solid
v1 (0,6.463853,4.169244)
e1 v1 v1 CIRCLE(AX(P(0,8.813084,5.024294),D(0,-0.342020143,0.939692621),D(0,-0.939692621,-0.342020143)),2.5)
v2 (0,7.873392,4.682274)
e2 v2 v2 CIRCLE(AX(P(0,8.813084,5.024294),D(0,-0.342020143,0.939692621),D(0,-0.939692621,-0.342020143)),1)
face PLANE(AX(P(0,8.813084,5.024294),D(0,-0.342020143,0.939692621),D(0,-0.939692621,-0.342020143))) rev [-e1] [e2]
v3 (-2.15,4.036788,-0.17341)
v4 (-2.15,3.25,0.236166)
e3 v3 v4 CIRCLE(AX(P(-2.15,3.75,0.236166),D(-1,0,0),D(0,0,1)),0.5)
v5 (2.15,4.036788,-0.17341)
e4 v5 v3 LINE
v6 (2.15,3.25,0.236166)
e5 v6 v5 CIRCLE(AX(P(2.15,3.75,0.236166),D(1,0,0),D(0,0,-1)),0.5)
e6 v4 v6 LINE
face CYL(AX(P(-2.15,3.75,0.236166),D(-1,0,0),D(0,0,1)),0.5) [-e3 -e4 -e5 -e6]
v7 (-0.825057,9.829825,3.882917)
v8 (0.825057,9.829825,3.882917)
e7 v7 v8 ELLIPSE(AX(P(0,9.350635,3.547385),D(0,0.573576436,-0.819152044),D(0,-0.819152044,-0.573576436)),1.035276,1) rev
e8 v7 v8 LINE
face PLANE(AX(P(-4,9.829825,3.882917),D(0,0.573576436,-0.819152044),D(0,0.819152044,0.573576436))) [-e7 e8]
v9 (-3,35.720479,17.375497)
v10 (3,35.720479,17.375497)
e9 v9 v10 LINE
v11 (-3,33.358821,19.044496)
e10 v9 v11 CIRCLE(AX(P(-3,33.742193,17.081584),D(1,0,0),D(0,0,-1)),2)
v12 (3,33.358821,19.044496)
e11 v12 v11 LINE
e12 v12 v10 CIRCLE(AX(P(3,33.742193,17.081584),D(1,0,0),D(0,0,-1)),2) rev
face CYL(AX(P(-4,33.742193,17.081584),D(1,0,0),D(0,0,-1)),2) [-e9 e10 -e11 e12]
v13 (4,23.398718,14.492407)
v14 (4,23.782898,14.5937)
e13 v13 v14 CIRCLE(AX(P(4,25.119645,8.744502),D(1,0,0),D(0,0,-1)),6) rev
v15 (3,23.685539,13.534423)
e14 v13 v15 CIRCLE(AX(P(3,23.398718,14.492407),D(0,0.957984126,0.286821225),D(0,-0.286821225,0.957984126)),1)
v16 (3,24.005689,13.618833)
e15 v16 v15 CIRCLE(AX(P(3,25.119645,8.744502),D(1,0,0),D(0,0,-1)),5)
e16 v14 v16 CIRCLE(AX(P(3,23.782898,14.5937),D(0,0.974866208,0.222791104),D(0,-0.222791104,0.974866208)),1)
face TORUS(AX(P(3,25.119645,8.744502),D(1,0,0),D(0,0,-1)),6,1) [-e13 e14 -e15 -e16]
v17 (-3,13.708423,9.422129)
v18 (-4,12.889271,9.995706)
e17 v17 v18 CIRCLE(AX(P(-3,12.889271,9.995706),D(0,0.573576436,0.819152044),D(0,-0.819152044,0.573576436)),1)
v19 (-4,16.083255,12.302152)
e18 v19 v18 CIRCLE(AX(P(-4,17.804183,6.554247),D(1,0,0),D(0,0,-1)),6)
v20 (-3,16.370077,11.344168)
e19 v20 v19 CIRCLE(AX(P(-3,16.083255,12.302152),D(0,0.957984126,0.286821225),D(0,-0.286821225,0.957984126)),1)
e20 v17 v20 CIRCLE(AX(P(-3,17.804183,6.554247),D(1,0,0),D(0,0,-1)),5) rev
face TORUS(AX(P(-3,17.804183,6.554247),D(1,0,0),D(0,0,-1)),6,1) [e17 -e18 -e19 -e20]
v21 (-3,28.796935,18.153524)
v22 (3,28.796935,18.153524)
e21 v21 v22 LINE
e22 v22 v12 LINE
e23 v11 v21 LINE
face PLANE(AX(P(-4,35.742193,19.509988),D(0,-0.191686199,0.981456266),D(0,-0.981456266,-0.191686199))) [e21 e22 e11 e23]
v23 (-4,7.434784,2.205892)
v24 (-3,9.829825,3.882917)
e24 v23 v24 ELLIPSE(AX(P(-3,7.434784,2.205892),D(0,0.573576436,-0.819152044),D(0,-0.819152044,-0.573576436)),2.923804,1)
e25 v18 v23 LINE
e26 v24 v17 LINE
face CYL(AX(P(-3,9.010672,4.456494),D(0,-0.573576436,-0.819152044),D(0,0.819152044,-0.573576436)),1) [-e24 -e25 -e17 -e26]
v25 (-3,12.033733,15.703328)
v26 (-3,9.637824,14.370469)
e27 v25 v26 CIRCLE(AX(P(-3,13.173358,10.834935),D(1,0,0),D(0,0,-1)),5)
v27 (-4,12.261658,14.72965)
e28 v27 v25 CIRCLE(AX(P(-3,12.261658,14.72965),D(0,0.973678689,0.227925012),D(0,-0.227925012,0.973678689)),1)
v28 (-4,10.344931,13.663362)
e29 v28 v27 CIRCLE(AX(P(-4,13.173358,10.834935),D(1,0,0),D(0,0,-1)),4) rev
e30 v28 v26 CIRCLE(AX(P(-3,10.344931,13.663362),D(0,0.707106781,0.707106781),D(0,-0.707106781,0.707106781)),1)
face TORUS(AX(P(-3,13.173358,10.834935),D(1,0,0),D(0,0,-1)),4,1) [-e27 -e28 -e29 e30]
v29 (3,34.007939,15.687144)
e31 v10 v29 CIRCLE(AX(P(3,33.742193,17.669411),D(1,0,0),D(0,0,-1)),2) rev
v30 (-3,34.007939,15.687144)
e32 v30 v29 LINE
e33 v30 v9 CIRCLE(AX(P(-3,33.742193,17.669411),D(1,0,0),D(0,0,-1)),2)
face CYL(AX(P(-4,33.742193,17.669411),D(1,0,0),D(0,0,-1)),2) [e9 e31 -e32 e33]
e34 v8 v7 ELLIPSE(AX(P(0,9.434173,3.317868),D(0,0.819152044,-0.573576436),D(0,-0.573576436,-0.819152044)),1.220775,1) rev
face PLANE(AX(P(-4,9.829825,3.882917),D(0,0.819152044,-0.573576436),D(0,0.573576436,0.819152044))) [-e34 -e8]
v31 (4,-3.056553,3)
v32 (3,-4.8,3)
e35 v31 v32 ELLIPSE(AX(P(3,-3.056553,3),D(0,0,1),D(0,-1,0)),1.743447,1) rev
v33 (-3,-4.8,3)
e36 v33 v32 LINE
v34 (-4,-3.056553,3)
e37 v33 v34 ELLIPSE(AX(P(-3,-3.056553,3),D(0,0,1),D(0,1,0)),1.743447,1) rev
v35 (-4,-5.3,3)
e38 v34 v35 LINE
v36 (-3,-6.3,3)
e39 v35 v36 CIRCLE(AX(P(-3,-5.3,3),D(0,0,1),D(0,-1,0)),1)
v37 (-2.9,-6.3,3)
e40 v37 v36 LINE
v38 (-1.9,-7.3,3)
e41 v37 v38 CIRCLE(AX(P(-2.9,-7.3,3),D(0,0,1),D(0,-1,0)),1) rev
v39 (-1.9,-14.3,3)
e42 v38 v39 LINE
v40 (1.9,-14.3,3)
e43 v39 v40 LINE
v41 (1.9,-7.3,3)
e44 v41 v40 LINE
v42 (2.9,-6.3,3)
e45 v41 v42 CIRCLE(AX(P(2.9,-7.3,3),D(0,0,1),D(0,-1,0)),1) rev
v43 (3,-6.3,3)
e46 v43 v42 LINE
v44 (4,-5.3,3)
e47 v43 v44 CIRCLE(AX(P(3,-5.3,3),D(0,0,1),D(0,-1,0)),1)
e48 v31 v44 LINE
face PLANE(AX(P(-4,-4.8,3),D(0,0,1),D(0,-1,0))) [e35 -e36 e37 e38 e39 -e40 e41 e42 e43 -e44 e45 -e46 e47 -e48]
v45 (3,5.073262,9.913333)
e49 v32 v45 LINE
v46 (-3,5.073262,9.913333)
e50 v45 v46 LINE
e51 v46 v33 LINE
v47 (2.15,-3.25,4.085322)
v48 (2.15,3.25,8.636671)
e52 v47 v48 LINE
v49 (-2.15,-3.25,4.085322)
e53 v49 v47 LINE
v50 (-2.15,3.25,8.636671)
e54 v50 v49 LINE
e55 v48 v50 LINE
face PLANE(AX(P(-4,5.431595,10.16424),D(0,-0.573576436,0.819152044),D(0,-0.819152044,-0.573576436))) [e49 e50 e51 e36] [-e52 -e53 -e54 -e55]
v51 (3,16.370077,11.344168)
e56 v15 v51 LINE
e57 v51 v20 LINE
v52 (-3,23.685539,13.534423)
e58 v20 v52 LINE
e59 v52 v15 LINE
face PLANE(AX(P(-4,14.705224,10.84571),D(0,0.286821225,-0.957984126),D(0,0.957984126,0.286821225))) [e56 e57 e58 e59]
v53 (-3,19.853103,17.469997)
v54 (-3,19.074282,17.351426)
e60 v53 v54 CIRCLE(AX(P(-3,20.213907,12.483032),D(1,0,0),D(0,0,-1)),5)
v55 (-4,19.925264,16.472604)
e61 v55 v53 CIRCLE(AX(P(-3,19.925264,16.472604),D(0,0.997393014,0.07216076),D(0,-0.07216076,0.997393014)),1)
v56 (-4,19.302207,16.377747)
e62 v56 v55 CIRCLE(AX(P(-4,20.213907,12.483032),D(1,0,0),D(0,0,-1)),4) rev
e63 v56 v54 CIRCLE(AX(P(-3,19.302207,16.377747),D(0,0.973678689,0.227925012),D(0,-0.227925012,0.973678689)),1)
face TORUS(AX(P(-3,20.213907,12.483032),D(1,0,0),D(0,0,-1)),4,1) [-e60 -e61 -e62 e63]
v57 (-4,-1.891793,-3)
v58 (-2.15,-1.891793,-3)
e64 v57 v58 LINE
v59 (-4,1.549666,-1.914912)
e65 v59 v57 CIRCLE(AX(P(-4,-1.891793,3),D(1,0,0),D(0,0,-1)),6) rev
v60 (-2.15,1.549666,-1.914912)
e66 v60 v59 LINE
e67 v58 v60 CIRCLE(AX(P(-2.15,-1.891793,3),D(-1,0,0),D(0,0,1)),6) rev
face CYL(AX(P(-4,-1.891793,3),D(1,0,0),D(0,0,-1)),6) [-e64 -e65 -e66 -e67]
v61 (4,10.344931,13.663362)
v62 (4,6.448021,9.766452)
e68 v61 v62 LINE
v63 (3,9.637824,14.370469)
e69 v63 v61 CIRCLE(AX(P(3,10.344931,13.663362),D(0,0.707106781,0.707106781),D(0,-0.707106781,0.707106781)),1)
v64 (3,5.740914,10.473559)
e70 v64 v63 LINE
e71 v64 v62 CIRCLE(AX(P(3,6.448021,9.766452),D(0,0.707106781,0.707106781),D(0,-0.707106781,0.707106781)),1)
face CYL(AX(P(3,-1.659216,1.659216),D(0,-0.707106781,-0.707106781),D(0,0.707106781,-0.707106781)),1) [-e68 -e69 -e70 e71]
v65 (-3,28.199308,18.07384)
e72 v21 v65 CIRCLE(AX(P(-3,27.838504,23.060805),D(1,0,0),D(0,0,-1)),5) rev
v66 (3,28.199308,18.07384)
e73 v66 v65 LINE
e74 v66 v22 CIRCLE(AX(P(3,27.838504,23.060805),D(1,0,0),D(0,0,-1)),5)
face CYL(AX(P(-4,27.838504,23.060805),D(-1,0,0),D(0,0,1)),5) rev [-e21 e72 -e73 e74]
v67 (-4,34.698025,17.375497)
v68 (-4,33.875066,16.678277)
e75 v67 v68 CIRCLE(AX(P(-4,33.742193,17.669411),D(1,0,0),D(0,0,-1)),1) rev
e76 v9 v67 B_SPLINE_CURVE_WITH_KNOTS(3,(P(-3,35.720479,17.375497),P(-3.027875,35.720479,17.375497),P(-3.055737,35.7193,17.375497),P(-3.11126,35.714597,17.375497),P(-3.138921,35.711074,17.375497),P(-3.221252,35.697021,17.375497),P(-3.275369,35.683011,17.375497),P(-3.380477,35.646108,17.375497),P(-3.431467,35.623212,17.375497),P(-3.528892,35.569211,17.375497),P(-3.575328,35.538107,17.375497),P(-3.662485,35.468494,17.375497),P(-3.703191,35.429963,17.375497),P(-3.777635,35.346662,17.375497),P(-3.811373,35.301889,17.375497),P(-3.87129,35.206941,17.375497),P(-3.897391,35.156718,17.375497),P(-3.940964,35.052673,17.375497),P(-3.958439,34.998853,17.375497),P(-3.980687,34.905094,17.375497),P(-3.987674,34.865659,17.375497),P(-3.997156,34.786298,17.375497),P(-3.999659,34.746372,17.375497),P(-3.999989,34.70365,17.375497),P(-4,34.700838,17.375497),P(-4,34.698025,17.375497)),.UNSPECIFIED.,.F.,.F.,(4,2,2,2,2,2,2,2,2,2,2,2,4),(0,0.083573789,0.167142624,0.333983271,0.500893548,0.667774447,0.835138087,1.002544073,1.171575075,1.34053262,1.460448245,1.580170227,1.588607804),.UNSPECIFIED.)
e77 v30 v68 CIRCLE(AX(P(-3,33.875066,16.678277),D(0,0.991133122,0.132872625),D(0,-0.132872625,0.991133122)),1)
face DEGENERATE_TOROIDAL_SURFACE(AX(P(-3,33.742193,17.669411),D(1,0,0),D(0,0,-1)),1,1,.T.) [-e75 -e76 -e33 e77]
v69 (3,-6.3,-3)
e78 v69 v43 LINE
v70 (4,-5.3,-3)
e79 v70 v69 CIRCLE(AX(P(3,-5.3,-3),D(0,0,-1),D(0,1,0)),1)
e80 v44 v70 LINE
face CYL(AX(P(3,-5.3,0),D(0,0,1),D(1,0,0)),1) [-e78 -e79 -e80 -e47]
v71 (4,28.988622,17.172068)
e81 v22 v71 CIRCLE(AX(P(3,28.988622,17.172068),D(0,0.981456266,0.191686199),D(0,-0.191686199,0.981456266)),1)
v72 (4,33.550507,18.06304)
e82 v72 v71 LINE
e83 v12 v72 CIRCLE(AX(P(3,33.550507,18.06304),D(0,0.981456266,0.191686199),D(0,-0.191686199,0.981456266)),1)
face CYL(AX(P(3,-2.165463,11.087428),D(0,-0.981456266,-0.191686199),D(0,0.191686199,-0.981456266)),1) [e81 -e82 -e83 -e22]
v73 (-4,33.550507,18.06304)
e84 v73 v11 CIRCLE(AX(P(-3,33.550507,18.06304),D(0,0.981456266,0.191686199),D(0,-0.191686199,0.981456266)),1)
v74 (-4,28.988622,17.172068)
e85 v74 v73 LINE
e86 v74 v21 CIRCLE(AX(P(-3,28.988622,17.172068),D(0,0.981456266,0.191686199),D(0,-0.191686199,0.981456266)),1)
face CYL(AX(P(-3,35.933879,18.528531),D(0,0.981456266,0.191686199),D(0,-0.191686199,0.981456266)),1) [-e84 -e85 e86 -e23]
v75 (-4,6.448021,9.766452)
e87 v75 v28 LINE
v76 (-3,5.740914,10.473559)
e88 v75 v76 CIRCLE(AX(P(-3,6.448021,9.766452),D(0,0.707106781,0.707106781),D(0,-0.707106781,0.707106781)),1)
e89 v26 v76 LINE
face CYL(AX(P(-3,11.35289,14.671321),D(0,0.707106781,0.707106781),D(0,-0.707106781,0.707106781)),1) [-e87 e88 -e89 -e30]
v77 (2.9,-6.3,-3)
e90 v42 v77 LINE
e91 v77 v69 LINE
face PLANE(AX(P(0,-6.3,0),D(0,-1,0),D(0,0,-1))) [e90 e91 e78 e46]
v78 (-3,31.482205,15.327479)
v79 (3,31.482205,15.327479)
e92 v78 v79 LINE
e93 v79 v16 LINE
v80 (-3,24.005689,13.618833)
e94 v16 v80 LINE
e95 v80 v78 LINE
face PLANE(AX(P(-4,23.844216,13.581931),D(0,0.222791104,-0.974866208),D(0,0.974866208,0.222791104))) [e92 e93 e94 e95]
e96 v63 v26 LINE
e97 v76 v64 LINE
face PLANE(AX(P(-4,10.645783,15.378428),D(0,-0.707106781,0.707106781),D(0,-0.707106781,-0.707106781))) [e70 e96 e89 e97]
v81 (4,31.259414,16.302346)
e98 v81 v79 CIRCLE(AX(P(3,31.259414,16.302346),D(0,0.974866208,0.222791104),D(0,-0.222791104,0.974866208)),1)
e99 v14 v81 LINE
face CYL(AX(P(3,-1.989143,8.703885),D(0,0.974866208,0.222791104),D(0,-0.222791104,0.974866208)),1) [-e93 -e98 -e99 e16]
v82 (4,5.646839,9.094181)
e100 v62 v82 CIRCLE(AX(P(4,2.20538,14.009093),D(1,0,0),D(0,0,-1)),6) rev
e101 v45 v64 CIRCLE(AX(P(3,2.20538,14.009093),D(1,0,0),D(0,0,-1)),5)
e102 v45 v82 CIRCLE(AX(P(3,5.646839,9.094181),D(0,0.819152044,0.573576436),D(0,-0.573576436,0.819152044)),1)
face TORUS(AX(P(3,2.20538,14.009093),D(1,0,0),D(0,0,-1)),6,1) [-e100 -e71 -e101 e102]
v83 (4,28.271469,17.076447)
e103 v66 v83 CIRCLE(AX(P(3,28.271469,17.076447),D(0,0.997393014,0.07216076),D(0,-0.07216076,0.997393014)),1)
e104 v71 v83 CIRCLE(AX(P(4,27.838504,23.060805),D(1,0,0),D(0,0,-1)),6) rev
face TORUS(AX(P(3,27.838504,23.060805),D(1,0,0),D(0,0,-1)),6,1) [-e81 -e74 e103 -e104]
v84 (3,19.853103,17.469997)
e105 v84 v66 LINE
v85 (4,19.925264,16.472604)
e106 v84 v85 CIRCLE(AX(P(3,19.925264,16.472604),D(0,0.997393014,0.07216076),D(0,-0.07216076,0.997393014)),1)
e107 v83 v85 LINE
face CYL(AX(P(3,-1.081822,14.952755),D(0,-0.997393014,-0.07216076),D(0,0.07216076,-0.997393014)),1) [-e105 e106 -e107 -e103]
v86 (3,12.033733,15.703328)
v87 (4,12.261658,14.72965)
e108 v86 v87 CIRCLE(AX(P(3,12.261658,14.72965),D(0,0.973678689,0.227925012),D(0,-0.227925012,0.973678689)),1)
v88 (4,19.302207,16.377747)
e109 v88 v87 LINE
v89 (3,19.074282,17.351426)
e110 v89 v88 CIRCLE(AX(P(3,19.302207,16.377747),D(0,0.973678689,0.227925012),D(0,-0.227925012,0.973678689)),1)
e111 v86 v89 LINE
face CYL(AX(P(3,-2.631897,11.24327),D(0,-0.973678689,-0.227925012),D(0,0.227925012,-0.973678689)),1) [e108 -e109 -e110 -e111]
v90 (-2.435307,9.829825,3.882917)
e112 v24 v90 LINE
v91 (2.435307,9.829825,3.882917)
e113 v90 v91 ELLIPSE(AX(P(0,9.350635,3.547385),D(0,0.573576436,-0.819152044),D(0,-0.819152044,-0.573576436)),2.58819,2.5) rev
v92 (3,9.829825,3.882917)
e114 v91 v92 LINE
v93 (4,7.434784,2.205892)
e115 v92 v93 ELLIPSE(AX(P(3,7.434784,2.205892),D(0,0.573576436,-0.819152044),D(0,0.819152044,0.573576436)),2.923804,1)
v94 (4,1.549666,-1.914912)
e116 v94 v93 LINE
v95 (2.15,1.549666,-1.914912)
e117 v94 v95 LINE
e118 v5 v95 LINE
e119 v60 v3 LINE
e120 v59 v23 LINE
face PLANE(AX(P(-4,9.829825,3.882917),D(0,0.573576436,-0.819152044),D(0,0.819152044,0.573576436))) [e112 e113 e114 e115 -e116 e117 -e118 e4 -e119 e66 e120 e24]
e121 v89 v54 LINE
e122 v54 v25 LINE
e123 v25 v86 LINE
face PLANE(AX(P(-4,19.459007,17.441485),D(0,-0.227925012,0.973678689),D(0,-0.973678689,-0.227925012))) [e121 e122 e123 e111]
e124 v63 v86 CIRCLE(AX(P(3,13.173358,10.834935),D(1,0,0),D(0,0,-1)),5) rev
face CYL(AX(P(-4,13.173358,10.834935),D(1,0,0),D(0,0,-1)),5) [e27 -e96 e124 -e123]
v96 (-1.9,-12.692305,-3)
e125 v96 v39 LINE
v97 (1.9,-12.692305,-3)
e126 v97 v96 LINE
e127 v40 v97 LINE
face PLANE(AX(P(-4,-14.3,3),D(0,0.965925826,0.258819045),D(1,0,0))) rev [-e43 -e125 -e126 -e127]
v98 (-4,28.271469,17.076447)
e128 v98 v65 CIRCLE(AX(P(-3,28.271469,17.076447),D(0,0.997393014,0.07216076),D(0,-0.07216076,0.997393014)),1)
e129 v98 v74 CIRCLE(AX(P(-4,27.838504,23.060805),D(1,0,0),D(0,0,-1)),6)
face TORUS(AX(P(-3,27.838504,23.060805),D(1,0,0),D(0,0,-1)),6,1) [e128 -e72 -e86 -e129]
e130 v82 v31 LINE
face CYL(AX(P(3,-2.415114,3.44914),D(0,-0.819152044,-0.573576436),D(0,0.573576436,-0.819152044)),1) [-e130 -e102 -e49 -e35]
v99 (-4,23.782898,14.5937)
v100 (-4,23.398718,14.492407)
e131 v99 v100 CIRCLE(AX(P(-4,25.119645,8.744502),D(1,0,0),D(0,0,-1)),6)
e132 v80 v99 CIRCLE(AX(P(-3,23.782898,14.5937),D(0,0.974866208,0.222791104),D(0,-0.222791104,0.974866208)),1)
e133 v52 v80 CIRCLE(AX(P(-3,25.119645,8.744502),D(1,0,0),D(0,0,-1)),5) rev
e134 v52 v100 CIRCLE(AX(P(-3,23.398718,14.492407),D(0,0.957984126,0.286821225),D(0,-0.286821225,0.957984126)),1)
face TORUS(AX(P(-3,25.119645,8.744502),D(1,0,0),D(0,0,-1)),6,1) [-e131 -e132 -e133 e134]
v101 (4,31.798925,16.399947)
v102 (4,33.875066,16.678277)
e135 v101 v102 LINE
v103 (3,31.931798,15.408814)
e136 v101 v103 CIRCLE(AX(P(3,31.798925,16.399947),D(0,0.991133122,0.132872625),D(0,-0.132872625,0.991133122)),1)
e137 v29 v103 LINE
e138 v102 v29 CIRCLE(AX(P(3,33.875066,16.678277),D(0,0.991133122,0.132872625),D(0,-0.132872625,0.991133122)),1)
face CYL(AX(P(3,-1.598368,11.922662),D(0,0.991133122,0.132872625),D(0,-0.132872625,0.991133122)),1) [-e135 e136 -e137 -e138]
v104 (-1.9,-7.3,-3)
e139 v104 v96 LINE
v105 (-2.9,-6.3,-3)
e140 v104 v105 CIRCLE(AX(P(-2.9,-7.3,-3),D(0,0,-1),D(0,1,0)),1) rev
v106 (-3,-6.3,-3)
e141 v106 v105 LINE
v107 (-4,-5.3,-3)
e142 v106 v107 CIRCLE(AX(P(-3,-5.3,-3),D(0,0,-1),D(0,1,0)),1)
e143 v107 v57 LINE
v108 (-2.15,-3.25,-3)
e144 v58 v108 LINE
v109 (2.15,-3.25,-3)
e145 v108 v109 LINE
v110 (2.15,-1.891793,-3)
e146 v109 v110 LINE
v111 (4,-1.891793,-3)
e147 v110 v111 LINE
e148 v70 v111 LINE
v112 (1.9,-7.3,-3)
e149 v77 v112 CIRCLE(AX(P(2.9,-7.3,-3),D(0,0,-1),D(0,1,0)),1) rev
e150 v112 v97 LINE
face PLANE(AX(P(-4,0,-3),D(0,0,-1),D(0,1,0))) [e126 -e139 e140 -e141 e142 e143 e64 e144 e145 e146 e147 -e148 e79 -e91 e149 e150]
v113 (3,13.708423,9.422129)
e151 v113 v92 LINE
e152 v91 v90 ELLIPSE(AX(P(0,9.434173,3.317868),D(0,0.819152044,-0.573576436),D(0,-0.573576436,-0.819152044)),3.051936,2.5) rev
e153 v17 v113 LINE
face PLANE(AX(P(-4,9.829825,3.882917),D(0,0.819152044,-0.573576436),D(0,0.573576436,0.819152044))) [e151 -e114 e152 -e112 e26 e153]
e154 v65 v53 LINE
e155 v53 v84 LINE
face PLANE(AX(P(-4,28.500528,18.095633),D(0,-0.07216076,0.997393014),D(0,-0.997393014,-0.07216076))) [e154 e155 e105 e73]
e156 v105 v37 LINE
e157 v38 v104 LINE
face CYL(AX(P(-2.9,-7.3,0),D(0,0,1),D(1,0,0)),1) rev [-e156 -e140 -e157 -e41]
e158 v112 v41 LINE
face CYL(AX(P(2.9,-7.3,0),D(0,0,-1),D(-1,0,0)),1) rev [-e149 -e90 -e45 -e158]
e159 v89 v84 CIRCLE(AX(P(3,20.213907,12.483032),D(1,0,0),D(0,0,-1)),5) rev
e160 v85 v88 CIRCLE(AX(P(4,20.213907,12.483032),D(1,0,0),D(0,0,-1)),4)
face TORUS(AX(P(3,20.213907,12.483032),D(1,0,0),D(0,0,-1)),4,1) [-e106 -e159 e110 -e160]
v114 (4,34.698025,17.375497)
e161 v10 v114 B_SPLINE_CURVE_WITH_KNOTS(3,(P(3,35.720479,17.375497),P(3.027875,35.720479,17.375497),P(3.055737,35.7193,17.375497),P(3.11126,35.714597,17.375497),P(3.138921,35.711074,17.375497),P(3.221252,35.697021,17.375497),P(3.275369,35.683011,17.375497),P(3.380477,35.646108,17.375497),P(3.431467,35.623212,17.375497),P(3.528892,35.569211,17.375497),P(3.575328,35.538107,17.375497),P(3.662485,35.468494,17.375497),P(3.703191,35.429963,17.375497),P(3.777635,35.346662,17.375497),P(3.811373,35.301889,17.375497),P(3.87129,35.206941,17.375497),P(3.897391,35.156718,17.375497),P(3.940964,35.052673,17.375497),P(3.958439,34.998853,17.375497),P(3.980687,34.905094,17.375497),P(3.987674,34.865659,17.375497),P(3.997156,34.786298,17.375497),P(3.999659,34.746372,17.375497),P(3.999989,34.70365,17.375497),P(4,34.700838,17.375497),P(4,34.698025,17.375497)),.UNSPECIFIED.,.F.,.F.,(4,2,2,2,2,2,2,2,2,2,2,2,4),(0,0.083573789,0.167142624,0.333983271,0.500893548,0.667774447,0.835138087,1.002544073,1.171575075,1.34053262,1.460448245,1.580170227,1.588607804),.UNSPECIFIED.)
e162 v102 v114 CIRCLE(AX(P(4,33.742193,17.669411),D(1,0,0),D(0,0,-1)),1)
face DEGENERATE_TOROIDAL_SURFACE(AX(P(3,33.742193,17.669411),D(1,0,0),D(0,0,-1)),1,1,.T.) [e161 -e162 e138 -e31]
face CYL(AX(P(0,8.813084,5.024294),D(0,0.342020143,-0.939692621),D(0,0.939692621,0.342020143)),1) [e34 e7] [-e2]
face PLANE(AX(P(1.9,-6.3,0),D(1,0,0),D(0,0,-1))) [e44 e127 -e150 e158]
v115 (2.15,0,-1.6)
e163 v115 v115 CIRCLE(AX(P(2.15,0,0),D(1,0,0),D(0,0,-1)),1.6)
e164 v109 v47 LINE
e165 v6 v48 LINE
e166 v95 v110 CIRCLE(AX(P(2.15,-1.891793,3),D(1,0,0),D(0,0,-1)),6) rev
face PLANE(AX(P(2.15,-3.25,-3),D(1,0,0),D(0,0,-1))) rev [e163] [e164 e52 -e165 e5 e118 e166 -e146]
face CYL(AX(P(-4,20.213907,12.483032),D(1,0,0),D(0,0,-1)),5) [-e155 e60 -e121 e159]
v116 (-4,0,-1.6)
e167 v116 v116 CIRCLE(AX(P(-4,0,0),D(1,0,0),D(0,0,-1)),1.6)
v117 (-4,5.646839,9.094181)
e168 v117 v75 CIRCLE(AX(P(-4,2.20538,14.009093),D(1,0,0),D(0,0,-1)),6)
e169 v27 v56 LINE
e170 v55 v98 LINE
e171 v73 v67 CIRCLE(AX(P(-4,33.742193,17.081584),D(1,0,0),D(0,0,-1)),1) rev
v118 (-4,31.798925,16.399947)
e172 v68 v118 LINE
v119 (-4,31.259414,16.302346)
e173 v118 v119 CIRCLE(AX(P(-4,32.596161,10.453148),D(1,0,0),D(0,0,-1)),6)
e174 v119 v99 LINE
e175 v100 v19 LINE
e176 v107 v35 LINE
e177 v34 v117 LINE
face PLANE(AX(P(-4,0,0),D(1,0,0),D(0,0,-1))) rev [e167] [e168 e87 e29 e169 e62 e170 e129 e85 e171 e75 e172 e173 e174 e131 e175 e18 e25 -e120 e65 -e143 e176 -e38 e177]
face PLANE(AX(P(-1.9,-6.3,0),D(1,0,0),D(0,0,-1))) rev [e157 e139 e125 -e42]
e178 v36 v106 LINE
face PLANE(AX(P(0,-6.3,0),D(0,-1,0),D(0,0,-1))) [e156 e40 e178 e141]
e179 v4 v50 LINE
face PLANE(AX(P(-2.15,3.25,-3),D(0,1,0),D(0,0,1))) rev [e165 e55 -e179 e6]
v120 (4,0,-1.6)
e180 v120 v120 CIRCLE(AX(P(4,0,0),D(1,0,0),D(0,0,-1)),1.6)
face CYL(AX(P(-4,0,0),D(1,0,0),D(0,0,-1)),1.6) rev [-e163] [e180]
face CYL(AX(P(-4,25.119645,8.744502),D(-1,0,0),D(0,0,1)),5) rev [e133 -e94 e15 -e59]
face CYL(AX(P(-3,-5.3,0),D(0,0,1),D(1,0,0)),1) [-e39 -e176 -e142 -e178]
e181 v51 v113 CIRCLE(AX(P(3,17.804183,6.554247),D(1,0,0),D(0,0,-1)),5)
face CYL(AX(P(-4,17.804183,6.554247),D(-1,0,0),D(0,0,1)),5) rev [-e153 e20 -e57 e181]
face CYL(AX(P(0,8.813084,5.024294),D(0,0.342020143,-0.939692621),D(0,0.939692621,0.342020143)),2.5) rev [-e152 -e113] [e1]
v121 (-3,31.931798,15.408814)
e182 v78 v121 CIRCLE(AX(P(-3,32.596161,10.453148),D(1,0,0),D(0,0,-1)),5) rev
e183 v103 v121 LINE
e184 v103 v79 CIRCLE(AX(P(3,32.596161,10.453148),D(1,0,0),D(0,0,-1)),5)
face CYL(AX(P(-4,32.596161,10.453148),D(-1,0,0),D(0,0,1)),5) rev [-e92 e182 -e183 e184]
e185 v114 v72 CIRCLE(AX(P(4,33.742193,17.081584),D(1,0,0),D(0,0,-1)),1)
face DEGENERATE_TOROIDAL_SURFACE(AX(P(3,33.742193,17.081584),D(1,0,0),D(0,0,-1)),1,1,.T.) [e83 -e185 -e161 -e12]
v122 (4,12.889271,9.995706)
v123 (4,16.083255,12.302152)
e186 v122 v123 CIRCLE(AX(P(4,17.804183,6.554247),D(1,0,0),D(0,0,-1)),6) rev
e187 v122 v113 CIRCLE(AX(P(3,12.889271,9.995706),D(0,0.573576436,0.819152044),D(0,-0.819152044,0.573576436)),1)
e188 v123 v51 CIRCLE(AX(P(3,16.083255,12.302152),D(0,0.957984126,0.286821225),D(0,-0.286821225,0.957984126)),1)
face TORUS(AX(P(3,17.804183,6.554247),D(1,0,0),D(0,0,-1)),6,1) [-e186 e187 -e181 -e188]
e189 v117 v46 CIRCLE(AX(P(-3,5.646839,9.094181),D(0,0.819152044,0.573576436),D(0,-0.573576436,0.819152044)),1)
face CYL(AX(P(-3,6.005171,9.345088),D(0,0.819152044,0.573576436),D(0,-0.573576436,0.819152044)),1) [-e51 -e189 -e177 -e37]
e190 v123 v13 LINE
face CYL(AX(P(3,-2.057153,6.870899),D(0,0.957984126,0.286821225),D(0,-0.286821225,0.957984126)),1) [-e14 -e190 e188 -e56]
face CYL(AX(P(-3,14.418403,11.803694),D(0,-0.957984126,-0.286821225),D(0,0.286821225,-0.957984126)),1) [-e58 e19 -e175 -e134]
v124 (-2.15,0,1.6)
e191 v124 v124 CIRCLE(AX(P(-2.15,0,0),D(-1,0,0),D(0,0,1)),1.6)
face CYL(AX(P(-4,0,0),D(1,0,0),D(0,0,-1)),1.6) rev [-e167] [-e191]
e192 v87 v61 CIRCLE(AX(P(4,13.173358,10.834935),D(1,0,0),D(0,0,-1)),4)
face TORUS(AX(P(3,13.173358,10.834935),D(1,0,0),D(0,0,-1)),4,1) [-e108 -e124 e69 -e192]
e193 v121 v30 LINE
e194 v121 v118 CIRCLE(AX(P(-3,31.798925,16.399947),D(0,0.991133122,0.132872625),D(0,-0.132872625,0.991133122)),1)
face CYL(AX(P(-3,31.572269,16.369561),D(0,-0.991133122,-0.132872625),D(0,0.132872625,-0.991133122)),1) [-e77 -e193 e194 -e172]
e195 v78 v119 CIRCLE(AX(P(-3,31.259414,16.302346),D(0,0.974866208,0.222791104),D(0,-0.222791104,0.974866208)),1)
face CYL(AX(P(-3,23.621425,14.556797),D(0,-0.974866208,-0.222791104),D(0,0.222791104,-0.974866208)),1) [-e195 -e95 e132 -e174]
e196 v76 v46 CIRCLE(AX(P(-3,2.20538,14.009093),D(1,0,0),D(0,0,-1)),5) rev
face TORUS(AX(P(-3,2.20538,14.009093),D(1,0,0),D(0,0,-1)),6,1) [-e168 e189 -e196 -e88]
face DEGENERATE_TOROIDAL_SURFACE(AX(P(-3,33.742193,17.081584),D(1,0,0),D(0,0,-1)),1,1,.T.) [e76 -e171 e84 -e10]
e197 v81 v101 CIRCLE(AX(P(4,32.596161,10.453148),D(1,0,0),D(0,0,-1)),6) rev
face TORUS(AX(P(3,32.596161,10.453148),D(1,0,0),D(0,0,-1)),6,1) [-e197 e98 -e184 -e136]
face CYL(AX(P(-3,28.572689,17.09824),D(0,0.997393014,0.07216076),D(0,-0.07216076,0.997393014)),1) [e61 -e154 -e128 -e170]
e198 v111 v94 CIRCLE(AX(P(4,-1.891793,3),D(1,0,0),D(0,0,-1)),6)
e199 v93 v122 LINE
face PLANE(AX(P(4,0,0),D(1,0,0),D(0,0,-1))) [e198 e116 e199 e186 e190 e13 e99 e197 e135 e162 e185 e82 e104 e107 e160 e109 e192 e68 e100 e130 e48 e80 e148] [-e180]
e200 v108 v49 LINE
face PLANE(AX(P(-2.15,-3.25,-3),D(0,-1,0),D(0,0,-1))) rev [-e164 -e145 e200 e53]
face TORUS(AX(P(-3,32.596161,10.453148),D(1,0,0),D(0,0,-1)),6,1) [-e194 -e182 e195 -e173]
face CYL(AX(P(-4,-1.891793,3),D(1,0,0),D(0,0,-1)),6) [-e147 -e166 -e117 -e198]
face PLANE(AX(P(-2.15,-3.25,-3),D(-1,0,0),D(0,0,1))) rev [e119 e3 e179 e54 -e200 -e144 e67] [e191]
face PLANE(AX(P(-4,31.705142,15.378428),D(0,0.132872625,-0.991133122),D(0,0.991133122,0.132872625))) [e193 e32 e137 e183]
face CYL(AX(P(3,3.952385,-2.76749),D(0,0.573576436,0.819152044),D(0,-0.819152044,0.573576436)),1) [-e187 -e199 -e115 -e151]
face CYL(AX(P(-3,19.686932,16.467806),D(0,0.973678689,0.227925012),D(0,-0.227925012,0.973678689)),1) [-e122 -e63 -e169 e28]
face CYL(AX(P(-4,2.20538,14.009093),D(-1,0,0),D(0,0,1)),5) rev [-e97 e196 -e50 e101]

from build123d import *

# Parameters (mm, degrees)
BOSS_EXTRUDE1_DEPTH            = 4
BOSS_EXTRUDE1_DEPTH_BACK       = 4
CUT_EXTRUDE1_DEPTH             = 41.91630483998618
CUT_EXTRUDE1_DEPTH_BACK        = 41.91630483998618
SKETCH2_W                      = 4.3
SKETCH2_H                      = 6.500000000000001
CUT_EXTRUDE2_DEPTH             = 41.91630483998618
CUT_EXTRUDE2_DEPTH_BACK        = 41.91630483998618
SKETCH3_R                      = 1.6
FILLET1_R                      = 6
SKETCH4_W                      = 2.1
SKETCH4_H                      = 6
CUT_EXTRUDE3_DEPTH             = 8
CHAMFER1_SIZE2                 = 6
CHAMFER1_SIZE                  = 1.607695155
CUT_EXTRUDE4_REACH             = 42.961
SKETCH5_R                      = 2.5000000000000013
SKETCH5_R_2                    = 1.0000000000000007
CUT_EXTRUDE4_DIRECTION_2_DEPTH = 2
FILLET2_R                      = 0.5
FILLET4_R                      = 5
FILLET5_R                      = 2
FILLET3_R                      = 1
FILLET6_R                      = 1


# Some blends are built 0.0001 mm under size
with BuildPart() as part:
    # Sketch1 → Boss-Extrude1 (new, two sides: drawn at the far end of the back side and taken through both)
    with BuildSketch(Plane(origin=(0, 0, 0), x_dir=(0, 0, -1), z_dir=(1, 0, 0)).offset(-BOSS_EXTRUDE1_DEPTH_BACK)):
        Polygon((-3.000000000000001, -4.800000000000001), (-3, -14.3), (3, -14.3), (3.0000000000000027, 0), (-3.8829172362125313, 9.829824531467917), (-10.84570961266894, 14.70522424045184), (-13.58193115320061, 23.844215950393988), (-15.378428238466466, 31.705141587860197), (-15.919640758594626, 35.74219326392616), (-19.50998776121677, 35.742193263926154), (-18.095633132633182, 28.500528392334523), (-17.441484730828904, 19.459007101196175), (-15.378428238466466, 10.64578329548253), (-10.164239956075727, 5.43159501309181), align=None)
    extrude(amount=BOSS_EXTRUDE1_DEPTH + BOSS_EXTRUDE1_DEPTH_BACK)

    # Sketch2 → Cut-Extrude1 (cut, two sides: drawn at the far end of the back side and taken through both)
    with BuildSketch(Plane.XY.offset(-CUT_EXTRUDE1_DEPTH_BACK)):
        Rectangle(SKETCH2_W, SKETCH2_H)
    extrude(amount=CUT_EXTRUDE1_DEPTH + CUT_EXTRUDE1_DEPTH_BACK, mode=Mode.SUBTRACT)

    # Sketch3 → Cut-Extrude2 (cut, two sides: drawn at the far end of the back side and taken through both)
    with BuildSketch(Plane(origin=(0, 0, 0), x_dir=(0, 0, -1), z_dir=(1, 0, 0)).offset(-CUT_EXTRUDE2_DEPTH_BACK)):
        Circle(SKETCH3_R)
    extrude(amount=CUT_EXTRUDE2_DEPTH + CUT_EXTRUDE2_DEPTH_BACK, mode=Mode.SUBTRACT)

    # Fillet1
    fillet1_edges = [part.edges().sort_by_distance(p)[0] for p in [
        (-3.0749999999999997, 0, -3.0000000000000027),
        (3.075, 0, -3.0000000000000027),
    ]]
    fillet(fillet1_edges, radius=FILLET1_R)

    # Sketch4 → Cut-Extrude3 (cut)
    with BuildSketch(Plane.XZ.offset(14.3)):
        with Locations((-2.95, 0)):
            Rectangle(SKETCH4_W, SKETCH4_H)
        with Locations((2.95, 0)):
            Rectangle(SKETCH4_W, SKETCH4_H)
    extrude(amount=-CUT_EXTRUDE3_DEPTH, mode=Mode.SUBTRACT)

    # Chamfer1
    chamfer1_edges = [part.edges().sort_by_distance(p)[0] for p in [
        (0, -14.3, -3),
    ]]
    chamfer1_side = [part.faces().sort_by_distance(p)[0] for p in [
        (0, -14.267846096908267, -3),
    ]]
    chamfer(chamfer1_edges, length=CHAMFER1_SIZE - 0.0001, length2=CHAMFER1_SIZE2 - 0.0001, reference=chamfer1_side[0])  # a hair under: the kernel refuses the full size

    # Sketch5 → Cut-Extrude4 (cut, up to next)
    with BuildSketch(Plane(origin=(0, 0.10019833493160003, -0.27529266269151886), x_dir=(1, 0, 0), z_dir=(0, -0.34202014332567265, 0.939692620785907)), mode=Mode.PRIVATE) as cut_extrude4_sk1:
        with Locations(Location((0, 10, 0), (0, 0, 13.062852968))):
            Circle(SKETCH5_R)
        with Locations(Location((0, 10, 0), (0, 0, 34.405727741))):
            Circle(SKETCH5_R_2, mode=Mode.SUBTRACT)
    cut_extrude4_tool1 = extrude(cut_extrude4_sk1.sketch, amount=-CUT_EXTRUDE4_REACH, mode=Mode.PRIVATE) & part.part
    add(cut_extrude4_tool1.solids().sort_by_distance((-2.366426, 8.98117, 2.957117))[0], mode=Mode.SUBTRACT)

    # Sketch5 → Cut-Extrude4 direction 2 (cut)
    with BuildSketch(Plane(origin=(0, 0.10019833493160003, -0.27529266269151886), x_dir=(1, 0, 0), z_dir=(0, -0.34202014332567265, 0.939692620785907))):
        with Locations(Location((0, 10, 0), (0, 0, 13.062852968))):
            Circle(SKETCH5_R)
        with Locations(Location((0, 10, 0), (0, 0, 34.405727741))):
            Circle(SKETCH5_R_2, mode=Mode.SUBTRACT)
    extrude(amount=CUT_EXTRUDE4_DIRECTION_2_DEPTH, mode=Mode.SUBTRACT)

    # Fillet2
    fillet2_edges = [part.edges().sort_by_distance(p)[0] for p in [
        (4.4e-16, 3.25, -0.7243255008184559),
    ]]
    fillet(fillet2_edges, radius=FILLET2_R)

    # Fillet4
    # the kernel refuses this fillet: 5 mm, written as the material it adds along each edge
    with BuildSketch(Plane(origin=(4, 5.43159501309181, 10.164239956075727), x_dir=(0, 0.7071067811865465, 0.7071067811865486), z_dir=(-1, 0, 0))) as fillet4_piece_1:
        with BuildLine():
            CenterArc((FILLET4_R * 0.0874886635259, -FILLET4_R), FILLET4_R, 89.99999999999997, 10.000000000000199)
            Line((-FILLET4_R * 0.086159514141, -FILLET4_R * 0.0151922469878), (0, 0))
            Line((0, 0), (FILLET4_R * 0.0874886635259, 2e-17))
        make_face()
    extrude(amount=8)
    with BuildSketch(Plane(origin=(-4, 28.500528392334523, 18.095633132633182), x_dir=(0, 0.9814562655585333, 0.19168619876219029), z_dir=(1, 0, 0))) as fillet4_piece_2:
        with BuildLine():
            CenterArc((FILLET4_R * 0.0604014869533, FILLET4_R), FILLET4_R, 263.08689839308795, 6.913101606911994)
            Line((-FILLET4_R * 0.0599623587654, FILLET4_R * 0.00727015525684), (0, 0))
            Line((0, 0), (FILLET4_R * 0.0604014869533, -1e-17))
        make_face()
    extrude(amount=8)
    with BuildSketch(Plane(origin=(-4, 31.705141587860197, 15.378428238466466), x_dir=(0, -0.9748662082340892, -0.22279110404881375), z_dir=(1, 0, 0))) as fillet4_piece_3:
        with BuildLine():
            CenterArc((FILLET4_R * 0.0457367799451, FILLET4_R), FILLET4_R, 264.762601002661, 5.237398997338971)
            Line((-FILLET4_R * 0.0455458301397, FILLET4_R * 0.00417497265026), (0, 0))
            Line((0, 0), (FILLET4_R * 0.0457367799451, 0))
        make_face()
    extrude(amount=8)
    with BuildSketch(Plane(origin=(-4, 23.844215950393988, 13.58193115320061), x_dir=(0, -0.9579841255207325, -0.28682122524366543), z_dir=(1, 0, 0))) as fillet4_piece_4:
        with BuildLine():
            CenterArc((FILLET4_R * 0.0331273043115, FILLET4_R), FILLET4_R, 266.20527827895825, 3.794721721041242)
            Line((-FILLET4_R * 0.0330546749969, FILLET4_R * 0.00219243056848), (0, 0))
            Line((0, 0), (FILLET4_R * 0.0331273043115, 0))
        make_face()
    extrude(amount=8)
    with BuildSketch(Plane(origin=(-4, 14.70522424045184, 10.84570961266894), x_dir=(0, -0.5735764363510492, -0.8191520442889896), z_dir=(1, 0, 0))) as fillet4_piece_5:
        with BuildLine():
            CenterArc((FILLET4_R * 0.347574122955, FILLET4_R), FILLET4_R, 231.66774277351772, 38.332257226482284)
            Line((-FILLET4_R * 0.272646635616, FILLET4_R * 0.215572686199), (0, 0))
            Line((0, 0), (FILLET4_R * 0.347574122955, -7e-17))
        make_face()
    extrude(amount=8)
    # the kernel refuses this fillet: 5 mm, written as the material it takes off along each edge
    with BuildSketch(Plane(origin=(7.563674379485587, 10.64578329548253, 15.378428238466466), x_dir=(0, -0.7071067811865464, -0.7071067811865488), z_dir=(-1, 0, 0))) as fillet4_2_piece_1:
        with BuildLine():
            CenterArc((FILLET4_R * 0.285093950359, -FILLET4_R), FILLET4_R, 90.00000000000001, 31.825060763139305)
            Line((-FILLET4_R * 0.242233531689, -FILLET4_R * 0.15033787499), (0, 0))
            Line((0, 0), (FILLET4_R * 0.285093950359, -2e-17))
        make_face()
    extrude(amount=15.127348758971173, mode=Mode.SUBTRACT)
    with BuildSketch(Plane(origin=(-4.987814470464539, 19.459007101196175, 17.441484730828904), x_dir=(0, -0.973678688774351, -0.22792501184964434), z_dir=(1, 0, 0))) as fillet4_2_piece_2:
        with BuildLine():
            CenterArc((FILLET4_R * 0.0790251576372, FILLET4_R), FILLET4_R, 260.9631643644952, 9.036835635504929)
            Line((-FILLET4_R * 0.0780442629476, FILLET4_R * 0.0124124357217), (0, 0))
            Line((0, 0), (FILLET4_R * 0.0790251576372, 0))
        make_face()
    extrude(amount=9.975628940929077, mode=Mode.SUBTRACT)

    # Fillet5
    # the kernel refuses this fillet: 2 mm, written as the material it takes off along each edge
    with BuildSketch(Plane(origin=(-8.374424360751373, 35.74219326392616, 15.919640758594626), x_dir=(0, -0.9911331219582963, -0.1328726253116156), z_dir=(1, 0, 0))) as fillet5_piece_1:
        with BuildLine():
            CenterArc((FILLET5_R * 0.87488487215, -FILLET5_R), FILLET5_R, 90.00000000000006, 82.3643779448629)
            Line((-FILLET5_R * 0.116248249808, -FILLET5_R * 0.867127374688), (0, 0))
            Line((0, 0), (FILLET5_R * 0.87488487215, 2e-17))
        make_face()
    extrude(amount=16.748848721502746, mode=Mode.SUBTRACT)
    with BuildSketch(Plane(origin=(-10.071010194652018, 35.742193263926154, 19.50998776121677), x_dir=(0, 2.93e-15, -1), z_dir=(1, 0, 0))) as fillet5_piece_2:
        with BuildLine():
            CenterArc((FILLET5_R * 1.21420203893, -FILLET5_R), FILLET5_R, 89.99999999999993, 101.05120520826807)
            Line((FILLET5_R * 0.232745773372, -FILLET5_R * 1.19168619876), (0, 0))
            Line((0, 0), (FILLET5_R * 1.21420203893, 0))
        make_face()
    extrude(amount=20.142020389304037, mode=Mode.SUBTRACT)

    # Fillet3
    fillet3_edges = [part.edges().sort_by_distance(p)[0] for p in [
        (-4, -6.300000000000001, 0),
        (-1.9, -6.300000000000001, 0),
        (4, -6.300000000000001, 0),
        (1.9, -6.300000000000001, 0),
    ]]
    fillet(fillet3_edges, radius=FILLET3_R)

    # Fillet6
    # the kernel refuses this fillet: 1 mm, written as the material it takes off along each edge
    with BuildSketch(Plane(origin=(-4, 7.392124676975955, 0.40152104798432475), x_dir=(0, -0.8191520442889894, 0.5735764363510496), z_dir=(0, 0.5735764363510496, 0.8191520442889894))) as fillet6_piece_1:
        with BuildLine():
            CenterArc((FILLET6_R, FILLET6_R), FILLET6_R, 180, 90)
            Line((9.5e-16, FILLET6_R), (0, 0))
            Line((0, 0), (FILLET6_R, 0))
        make_face()
    extrude(amount=11.012129385225144, mode=Mode.SUBTRACT)
    with BuildSketch(Plane(origin=(4, 28.199308286666977, 18.07384004667243), x_dir=(-1, -2.6e-16, 3.53e-15), z_dir=(0, -0.9973930141843592, -0.07216075980918318))) as fillet6_piece_2:
        with BuildLine():
            CenterArc((FILLET6_R, FILLET6_R), FILLET6_R, 180.00000000000017, 90)
            Line((-3.54e-15, FILLET6_R), (0, 0))
            Line((0, 0), (FILLET6_R, 0))
        make_face()
    extrude(amount=8.368020796130923, mode=Mode.SUBTRACT)
    with BuildSketch(Plane(origin=(-4, 28.199308286666977, 18.07384004667243), x_dir=(0, 0.07216075980918318, -0.9973930141843592), z_dir=(0, -0.9973930141843592, -0.07216075980918318))) as fillet6_piece_3:
        with BuildLine():
            CenterArc((FILLET6_R, FILLET6_R), FILLET6_R, 180, 90)
            Line((0, FILLET6_R), (0, 0))
            Line((0, 0), (FILLET6_R, 0))
        make_face()
    extrude(amount=8.368020796130923, mode=Mode.SUBTRACT)
    with BuildSketch(Plane(origin=(4, 24.00568939810992, 13.61883349670923), x_dir=(-1, -1.8e-16, 7.7e-16), z_dir=(0, 0.9748662082340894, 0.22279110404881328))) as fillet6_piece_4:
        with BuildLine():
            CenterArc((FILLET6_R, FILLET6_R), FILLET6_R, 179.99999999999986, 90.00000000000011)
            Line((7.9e-16, FILLET6_R), (0, 0))
            Line((0, 0), (FILLET6_R, 0))
        make_face()
    extrude(amount=7.6692739171702975, mode=Mode.SUBTRACT)
    with BuildSketch(Plane(origin=(-4, 24.00568939810992, 13.61883349670923), x_dir=(0, -0.22279110404881328, 0.9748662082340895), z_dir=(0, 0.9748662082340894, 0.22279110404881328))) as fillet6_piece_5:
        with BuildLine():
            CenterArc((FILLET6_R, FILLET6_R), FILLET6_R, 180, 90)
            Line((2.52e-15, FILLET6_R), (0, 0))
            Line((0, 0), (FILLET6_R, 0))
        make_face()
    extrude(amount=7.6692739171702975, mode=Mode.SUBTRACT)
    with BuildSketch(Plane(origin=(4, 31.931797775336367, 15.408814068589443), x_dir=(-1, 4.7e-16, -3.49e-15), z_dir=(0, 0.9911331219582964, 0.13287262531161528))) as fillet6_piece_6:
        with BuildLine():
            CenterArc((FILLET6_R, FILLET6_R), FILLET6_R, 179.99999999999986, 90.00000000000034)
            Line((-3.52e-15, FILLET6_R), (0, 0))
            Line((0, 0), (FILLET6_R, 0))
        make_face()
    extrude(amount=2.094714315581929, mode=Mode.SUBTRACT)
    with BuildSketch(Plane(origin=(-4, 31.931797775336367, 15.408814068589443), x_dir=(0, -0.13287262531161528, 0.9911331219582964), z_dir=(0, 0.9911331219582964, 0.13287262531161528))) as fillet6_piece_7:
        with BuildLine():
            CenterArc((FILLET6_R, FILLET6_R), FILLET6_R, 180, 90)
            Line((0, FILLET6_R), (0, 0))
            Line((0, 0), (FILLET6_R, 0))
        make_face()
    extrude(amount=2.094714315581929, mode=Mode.SUBTRACT)
    with BuildSketch(Plane(origin=(4, 16.37007670161563, 11.344167791713767), x_dir=(-1, -2.9e-16, 9.8e-16), z_dir=(0, 0.9579841255207351, 0.2868212252436569))) as fillet6_piece_8:
        with BuildLine():
            CenterArc((FILLET6_R, FILLET6_R), FILLET6_R, 179.99999999999986, 90.00000000000011)
            Line((1.02e-15, FILLET6_R), (0, 0))
            Line((0, 0), (FILLET6_R, 0))
        make_face()
    extrude(amount=7.636308259850825, mode=Mode.SUBTRACT)
    with BuildSketch(Plane(origin=(-4, 16.37007670161563, 11.344167791713767), x_dir=(0, -0.28682122524365694, 0.9579841255207351), z_dir=(0, 0.9579841255207351, 0.2868212252436569))) as fillet6_piece_9:
        with BuildLine():
            CenterArc((FILLET6_R, FILLET6_R), FILLET6_R, 180, 90)
            Line((2.72e-15, FILLET6_R), (0, 0))
            Line((0, 0), (FILLET6_R, 0))
        make_face()
    extrude(amount=7.636308259850825, mode=Mode.SUBTRACT)
    with BuildSketch(Plane(origin=(4, 19.074281541854155, 17.351425680874474), x_dir=(-1, 1.8e-16, -7.9e-16), z_dir=(0, -0.9736786887743505, -0.2279250118496466))) as fillet6_piece_10:
        with BuildLine():
            CenterArc((FILLET6_R, FILLET6_R), FILLET6_R, 180, 89.99999999999994)
            Line((8.1e-16, FILLET6_R), (0, 0))
            Line((0, 0), (FILLET6_R, 0))
        make_face()
    extrude(amount=7.23087483451074, mode=Mode.SUBTRACT)
    with BuildSketch(Plane(origin=(-4, 19.074281541854155, 17.351425680874474), x_dir=(0, 0.2279250118496466, -0.9736786887743504), z_dir=(0, -0.9736786887743505, -0.2279250118496466))) as fillet6_piece_11:
        with BuildLine():
            CenterArc((FILLET6_R, FILLET6_R), FILLET6_R, 180, 90)
            Line((8.1e-16, FILLET6_R), (0, 0))
            Line((0, 0), (FILLET6_R, 0))
        make_face()
    extrude(amount=7.23087483451074, mode=Mode.SUBTRACT)
    with BuildSketch(Plane(origin=(4, 9.637823967611984, 14.370468910595916), x_dir=(-1, 0, 0), z_dir=(0, -0.7071067811865464, -0.7071067811865488))) as fillet6_piece_12:
        with BuildLine():
            CenterArc((FILLET6_R, FILLET6_R), FILLET6_R, 180, 90)
            Line((0, FILLET6_R), (0, 0))
            Line((0, 0), (FILLET6_R, 0))
        make_face()
    extrude(amount=5.511062716299017, mode=Mode.SUBTRACT)
    with BuildSketch(Plane(origin=(4, 5.073262425195165, 9.913332776844305), x_dir=(-1, 0, 0), z_dir=(0, -0.8191520442889931, -0.5735764363510443))) as fillet6_piece_13_section:
        with BuildLine():
            CenterArc((FILLET6_R, FILLET6_R), FILLET6_R, 180.00000000000006, 89.99999999999994)
            Line((0, FILLET6_R), (0, 0))
            Line((0, 0), (FILLET6_R, 0))
        make_face()
    fillet6_piece_13 = extrude(amount=14.553027876851548, mode=Mode.PRIVATE)
    fillet6_piece_13 = split(fillet6_piece_13, bisect_by=Plane(origin=(4, 5.073262425195166, 3.0000000000000018), z_dir=(0, -9e-17, 1)), keep=Keep.TOP, mode=Mode.PRIVATE)
    add(fillet6_piece_13, mode=Mode.SUBTRACT)
    with BuildSketch(Plane(origin=(4.000000000000001, 20.21390660110446, 12.483032237003172), x_dir=(0, -0.22792501185005917, 0.9736786887742539), z_dir=(0, -0.9736786887742539, -0.22792501185005917))) as fillet6_piece_14:
        with BuildLine():
            CenterArc((5.0000000000000036 - FILLET6_R, FILLET6_R), FILLET6_R, 270.0000000000002, 89.99999999999977)
            Line((5.0000000000000036 - FILLET6_R, 0), (5.0000000000000036, 0))
            Line((5.0000000000000036, 0), (5, FILLET6_R))
        make_face()
    revolve(axis=Axis((4.000000000000001, 20.21390660110446, 12.483032237003172), (-1, 0, 0)), revolution_arc=9.036835635504966, mode=Mode.SUBTRACT)
    with BuildSketch(Plane(origin=(4, 13.17335787354519, 10.834935004662714), x_dir=(0, -0.2279250118496492, 0.9736786887743498), z_dir=(0, 0.9736786887743498, 0.2279250118496492))) as fillet6_piece_15:
        with BuildLine():
            CenterArc((4.999999999999999 - FILLET6_R, -FILLET6_R), FILLET6_R, 0, 89.99999999999994)
            Line((4.999999999999999 - FILLET6_R, 0), (4.999999999999999, 0))
            Line((4.999999999999999, 0), (5, -FILLET6_R))
        make_face()
    revolve(axis=Axis((4, 13.17335787354519, 10.834935004662714), (1, 0, 0)), revolution_arc=31.825060763138996, mode=Mode.SUBTRACT)
    with BuildSketch(Plane(origin=(-4, 9.637823967611984, 14.370468910595916), x_dir=(0, 0.7071067811865488, -0.7071067811865464), z_dir=(0, -0.7071067811865464, -0.7071067811865488))) as fillet6_piece_16:
        with BuildLine():
            CenterArc((FILLET6_R, FILLET6_R), FILLET6_R, 180, 90)
            Line((0, FILLET6_R), (0, 0))
            Line((0, 0), (FILLET6_R, 0))
        make_face()
    extrude(amount=5.511062716299017, mode=Mode.SUBTRACT)
    with BuildSketch(Plane(origin=(-4, 5.073262425195165, 9.913332776844305), x_dir=(0, 0.5735764363510443, -0.8191520442889931), z_dir=(0, -0.8191520442889931, -0.5735764363510443))) as fillet6_piece_17_section:
        with BuildLine():
            CenterArc((FILLET6_R, FILLET6_R), FILLET6_R, 180, 90)
            Line((-1.96e-15, FILLET6_R), (0, 0))
            Line((0, 0), (FILLET6_R, 0))
        make_face()
    fillet6_piece_17 = extrude(amount=14.553027876851548, mode=Mode.PRIVATE)
    fillet6_piece_17 = split(fillet6_piece_17, bisect_by=Plane(origin=(-4, 5.073262425195166, 3.0000000000000018), z_dir=(0, -9e-17, 1)), keep=Keep.TOP, mode=Mode.PRIVATE)
    add(fillet6_piece_17, mode=Mode.SUBTRACT)
    with BuildSketch(Plane(origin=(-4, 20.21390660110446, 12.483032237003172), x_dir=(0, -0.22792501185005917, 0.9736786887742539), z_dir=(0, -0.9736786887742539, -0.22792501185005917))) as fillet6_piece_18:
        with BuildLine():
            CenterArc((5.0000000000000036 - FILLET6_R, -FILLET6_R), FILLET6_R, 0, 90)
            Line((5.0000000000000036, -FILLET6_R), (5.0000000000000036, 0))
            Line((5.0000000000000036, 0), (5.0000000000000036 - FILLET6_R, 0))
        make_face()
    revolve(axis=Axis((-4, 20.21390660110446, 12.483032237003172), (-1, 0, 0)), revolution_arc=9.036835635504966, mode=Mode.SUBTRACT)
    with BuildSketch(Plane(origin=(-3.999999999999999, 13.17335787354519, 10.834935004662714), x_dir=(0, -0.2279250118496492, 0.9736786887743498), z_dir=(0, 0.9736786887743498, 0.2279250118496492))) as fillet6_piece_19:
        with BuildLine():
            CenterArc((4.999999999999999 - FILLET6_R, FILLET6_R), FILLET6_R, 270, 90.00000000000006)
            Line((5.0000000000000036, FILLET6_R), (4.999999999999999, 0))
            Line((4.999999999999999, 0), (4.999999999999999 - FILLET6_R, -8.9e-16))
        make_face()
    revolve(axis=Axis((-3.999999999999999, 13.17335787354519, 10.834935004662714), (1, 0, 0)), revolution_arc=31.825060763138996, mode=Mode.SUBTRACT)
    with BuildSketch(Plane(origin=(4, 27.83850448762226, 23.06080511759416), x_dir=(0, 0.07216075980890861, -0.9973930141843791), z_dir=(0, -0.9973930141843791, -0.07216075980890861))) as fillet6_piece_20:
        with BuildLine():
            CenterArc((4.999999999999998 + FILLET6_R, -FILLET6_R), FILLET6_R, 89.99999999999994, 90.00000000000006)
            Line((4.999999999999998 + FILLET6_R, 0), (4.999999999999998, 0))
            Line((4.999999999999998, 0), (4.999999999999998, -FILLET6_R))
        make_face()
    revolve(axis=Axis((4, 27.83850448762226, 23.06080511759416), (1, 0, 0)), revolution_arc=6.913101606911969, mode=Mode.SUBTRACT)
    with BuildSketch(Plane(origin=(-4, 27.83850448762226, 23.06080511759416), x_dir=(0, 0.07216075980890861, -0.9973930141843791), z_dir=(0, -0.9973930141843791, -0.07216075980890861))) as fillet6_piece_21:
        with BuildLine():
            CenterArc((4.999999999999998 + FILLET6_R, FILLET6_R), FILLET6_R, 180, 90)
            Line((4.999999999999998, FILLET6_R), (4.999999999999998, 0))
            Line((4.999999999999998, 0), (4.999999999999998 + FILLET6_R, 0))
        make_face()
    revolve(axis=Axis((-4, 27.83850448762226, 23.06080511759416), (1, 0, 0)), revolution_arc=6.913101606911969, mode=Mode.SUBTRACT)
    with BuildSketch(Plane(origin=(4, 32.59616090189547, 10.453148458797703), x_dir=(0, -0.13287262531181343, 0.9911331219582697), z_dir=(0, 0.9911331219582697, 0.13287262531181343))) as fillet6_piece_22:
        with BuildLine():
            CenterArc((4.999999999999997 + FILLET6_R, -FILLET6_R), FILLET6_R, 90.0000000000002, 89.99999999999977)
            Line((4.999999999999997 + FILLET6_R, 0), (4.999999999999997, 0))
            Line((4.999999999999997, 0), (5.000000000000001, -FILLET6_R))
        make_face()
    revolve(axis=Axis((4, 32.59616090189547, 10.453148458797703), (1, 0, 0)), revolution_arc=5.237398997339021, mode=Mode.SUBTRACT)
    with BuildSketch(Plane(origin=(-4, 32.59616090189547, 10.453148458797703), x_dir=(0, -0.13287262531181343, 0.9911331219582697), z_dir=(0, 0.9911331219582697, 0.13287262531181343))) as fillet6_piece_23:
        with BuildLine():
            CenterArc((4.999999999999997 + FILLET6_R, FILLET6_R), FILLET6_R, 180, 90)
            Line((4.999999999999997, FILLET6_R), (4.999999999999997, 0))
            Line((4.999999999999997, 0), (4.999999999999997 + FILLET6_R, 0))
        make_face()
    revolve(axis=Axis((-4, 32.59616090189547, 10.453148458797703), (1, 0, 0)), revolution_arc=5.237398997339021, mode=Mode.SUBTRACT)
    with BuildSketch(Plane(origin=(4, 25.119644918354947, 8.744502455539427), x_dir=(0, -0.22279110404904903, 0.9748662082340355), z_dir=(0, 0.9748662082340355, 0.22279110404904903))) as fillet6_piece_24:
        with BuildLine():
            CenterArc((4.999999999999999 + FILLET6_R, -FILLET6_R), FILLET6_R, 89.9999999999998, 90.00000000000023)
            Line((4.999999999999999 + FILLET6_R, 0), (4.999999999999999, 0))
            Line((4.999999999999999, 0), (4.999999999999998, -FILLET6_R))
        make_face()
    revolve(axis=Axis((4, 25.119644918354947, 8.744502455539427), (1, 0, 0)), revolution_arc=3.794721721040992, mode=Mode.SUBTRACT)
    with BuildSketch(Plane(origin=(-4, 25.119644918354947, 8.744502455539427), x_dir=(0, -0.22279110404904903, 0.9748662082340355), z_dir=(0, 0.9748662082340355, 0.22279110404904903))) as fillet6_piece_25:
        with BuildLine():
            CenterArc((4.999999999999999 + FILLET6_R, FILLET6_R), FILLET6_R, 180, 90)
            Line((5, FILLET6_R), (4.999999999999999, 0))
            Line((4.999999999999999, 0), (4.999999999999999 + FILLET6_R, 0))
        make_face()
    revolve(axis=Axis((-4, 25.119644918354947, 8.744502455539427), (1, 0, 0)), revolution_arc=3.794721721040992, mode=Mode.SUBTRACT)
    with BuildSketch(Plane(origin=(4, 17.804182827835298, 6.554247164111192), x_dir=(0, -0.2868212252437068, 0.9579841255207201), z_dir=(0, 0.9579841255207201, 0.2868212252437068))) as fillet6_piece_26:
        with BuildLine():
            CenterArc((5.000000000000001 + FILLET6_R, -FILLET6_R), FILLET6_R, 89.9999999999999, 90.00000000000011)
            Line((5.000000000000001 + FILLET6_R, 0), (5.000000000000001, 0))
            Line((5.000000000000001, 0), (4.999999999999999, -FILLET6_R))
        make_face()
    revolve(axis=Axis((4, 17.804182827835298, 6.554247164111192), (1, 0, 0)), revolution_arc=38.33225722648201, mode=Mode.SUBTRACT)
    with BuildSketch(Plane(origin=(-4, 17.804182827835298, 6.554247164111192), x_dir=(0, -0.2868212252437068, 0.9579841255207201), z_dir=(0, 0.9579841255207201, 0.2868212252437068))) as fillet6_piece_27:
        with BuildLine():
            CenterArc((5.000000000000001 + FILLET6_R, FILLET6_R), FILLET6_R, 180, 90)
            Line((5.000000000000003, FILLET6_R), (5.000000000000001, 0))
            Line((5.000000000000001, 0), (5.000000000000001 + FILLET6_R, 0))
        make_face()
    revolve(axis=Axis((-4, 17.804182827835298, 6.554247164111192), (1, 0, 0)), revolution_arc=38.33225722648201, mode=Mode.SUBTRACT)
    with BuildSketch(Plane(origin=(4, 2.205380243439823, 14.009092998289299), x_dir=(0, 0.7071067811865476, -0.7071067811865476), z_dir=(0, 0.7071067811865476, 0.7071067811865476))) as fillet6_piece_28:
        with BuildLine():
            CenterArc((5.000000000000001 + FILLET6_R, FILLET6_R), FILLET6_R, 180, 89.99999999999994)
            Line((5.000000000000001 + FILLET6_R, 0), (5.000000000000001, 0))
            Line((5.000000000000001, 0), (5.000000000000001, FILLET6_R))
        make_face()
    revolve(axis=Axis((4, 2.205380243439823, 14.009092998289299), (-1, 0, 0)), revolution_arc=10.000000000000002, mode=Mode.SUBTRACT)
    with BuildSketch(Plane(origin=(-4, 2.205380243439823, 14.009092998289299), x_dir=(0, 0.7071067811865476, -0.7071067811865476), z_dir=(0, 0.7071067811865476, 0.7071067811865476))) as fillet6_piece_29:
        with BuildLine():
            CenterArc((5.000000000000001 + FILLET6_R, -FILLET6_R), FILLET6_R, 90, 90)
            Line((5.000000000000001, -FILLET6_R), (5.000000000000001, 0))
            Line((5.000000000000001, 0), (5.000000000000001 + FILLET6_R, 0))
        make_face()
    revolve(axis=Axis((-4, 2.205380243439823, 14.009092998289299), (-1, 0, 0)), revolution_arc=10.000000000000002, mode=Mode.SUBTRACT)
    with BuildSketch(Plane(origin=(4, 33.358820866403825, 19.044496214473433), x_dir=(-1, -2.6e-16, 1.34e-15), z_dir=(0, -0.9814562655585335, -0.19168619876218898))) as fillet6_piece_30:
        with BuildLine():
            CenterArc((FILLET6_R, FILLET6_R), FILLET6_R, 179.99999999999991, 90.00000000000017)
            Line((-1.36e-15, FILLET6_R), (0, 0))
            Line((0, 0), (FILLET6_R, 0))
        make_face()
    extrude(amount=4.648078111127988, mode=Mode.SUBTRACT)
    with BuildSketch(Plane(origin=(4, 33.742193263926, 17.081583683357003), x_dir=(0, -0.1916861987621914, 0.981456265558533), z_dir=(0, -0.981456265558533, -0.1916861987621914))) as fillet6_piece_31:
        with BuildLine():
            CenterArc((1.9999999999999967 - FILLET6_R, FILLET6_R), FILLET6_R, 269.9999999999998, 90.00000000000023)
            Line((1.9999999999999967 - FILLET6_R, 0), (1.9999999999999967, 0))
            Line((1.9999999999999967, 0), (1.9999999999999967, FILLET6_R))
        make_face()
    revolve(axis=Axis((4, 33.742193263926, 17.081583683357003), (-1, 0, 0)), revolution_arc=164.25078291404816, mode=Mode.SUBTRACT)
    with BuildSketch(Plane(origin=(4, 33.7421932639258, 17.669410502894777), x_dir=(0, 0.4510563219916968, 0.8924954870425524), z_dir=(0, -0.8924954870425524, 0.4510563219916968))) as fillet6_piece_32:
        with BuildLine():
            CenterArc((2 - FILLET6_R, FILLET6_R), FILLET6_R, 269.99999999999966, 90.00000000000034)
            Line((2 - FILLET6_R, 0), (2, 0))
            Line((2, 0), (2.000000000000003, FILLET6_R))
        make_face()
    revolve(axis=Axis((4, 33.7421932639258, 17.669410502894777), (-1, 0, 0)), revolution_arc=145.5529012529817, mode=Mode.SUBTRACT)
    with BuildSketch(Plane(origin=(-4, 33.358820866403825, 19.044496214473433), x_dir=(0, 0.19168619876218898, -0.9814562655585335), z_dir=(0, -0.9814562655585335, -0.19168619876218898))) as fillet6_piece_33:
        with BuildLine():
            CenterArc((FILLET6_R, FILLET6_R), FILLET6_R, 180, 90)
            Line((2.12e-15, FILLET6_R), (0, 0))
            Line((0, 0), (FILLET6_R, 0))
        make_face()
    extrude(amount=4.648078111127988, mode=Mode.SUBTRACT)
    with BuildSketch(Plane(origin=(-4, 33.742193263926, 17.081583683357003), x_dir=(0, -0.1916861987621914, 0.981456265558533), z_dir=(0, -0.981456265558533, -0.1916861987621914))) as fillet6_piece_34:
        with BuildLine():
            CenterArc((1.9999999999999967 - FILLET6_R, -FILLET6_R), FILLET6_R, 0, 90)
            Line((1.9999999999999967, -FILLET6_R), (1.9999999999999967, 0))
            Line((1.9999999999999967, 0), (1.9999999999999967 - FILLET6_R, 0))
        make_face()
    revolve(axis=Axis((-4, 33.742193263926, 17.081583683357003), (-1, 0, 0)), revolution_arc=164.25078291404816, mode=Mode.SUBTRACT)
    with BuildSketch(Plane(origin=(-4, 33.7421932639258, 17.669410502894777), x_dir=(0, 0.4510563219916968, 0.8924954870425524), z_dir=(0, -0.8924954870425524, 0.4510563219916968))) as fillet6_piece_35:
        with BuildLine():
            CenterArc((2 - FILLET6_R, -FILLET6_R), FILLET6_R, 0, 90)
            Line((1.9999999999999938, -FILLET6_R), (2, 0))
            Line((2, 0), (2 - FILLET6_R, 0))
        make_face()
    revolve(axis=Axis((-4, 33.7421932639258, 17.669410502894777), (-1, 0, 0)), revolution_arc=145.5529012529817, mode=Mode.SUBTRACT)
    with BuildSketch(Plane(origin=(4, 7.392124676975955, 0.40152104798432475), x_dir=(-1, -1.19e-15, 8.3e-16), z_dir=(0, 0.5735764363510496, 0.8191520442889894))) as fillet6_piece_36:
        with BuildLine():
            CenterArc((FILLET6_R, FILLET6_R), FILLET6_R, 179.99999999999997, 89.99999999999994)
            Line((1.46e-15, FILLET6_R), (0, 0))
            Line((0, 0), (FILLET6_R, 0))
        make_face()
    extrude(amount=11.012129385225144, mode=Mode.SUBTRACT)


solid = part.part
